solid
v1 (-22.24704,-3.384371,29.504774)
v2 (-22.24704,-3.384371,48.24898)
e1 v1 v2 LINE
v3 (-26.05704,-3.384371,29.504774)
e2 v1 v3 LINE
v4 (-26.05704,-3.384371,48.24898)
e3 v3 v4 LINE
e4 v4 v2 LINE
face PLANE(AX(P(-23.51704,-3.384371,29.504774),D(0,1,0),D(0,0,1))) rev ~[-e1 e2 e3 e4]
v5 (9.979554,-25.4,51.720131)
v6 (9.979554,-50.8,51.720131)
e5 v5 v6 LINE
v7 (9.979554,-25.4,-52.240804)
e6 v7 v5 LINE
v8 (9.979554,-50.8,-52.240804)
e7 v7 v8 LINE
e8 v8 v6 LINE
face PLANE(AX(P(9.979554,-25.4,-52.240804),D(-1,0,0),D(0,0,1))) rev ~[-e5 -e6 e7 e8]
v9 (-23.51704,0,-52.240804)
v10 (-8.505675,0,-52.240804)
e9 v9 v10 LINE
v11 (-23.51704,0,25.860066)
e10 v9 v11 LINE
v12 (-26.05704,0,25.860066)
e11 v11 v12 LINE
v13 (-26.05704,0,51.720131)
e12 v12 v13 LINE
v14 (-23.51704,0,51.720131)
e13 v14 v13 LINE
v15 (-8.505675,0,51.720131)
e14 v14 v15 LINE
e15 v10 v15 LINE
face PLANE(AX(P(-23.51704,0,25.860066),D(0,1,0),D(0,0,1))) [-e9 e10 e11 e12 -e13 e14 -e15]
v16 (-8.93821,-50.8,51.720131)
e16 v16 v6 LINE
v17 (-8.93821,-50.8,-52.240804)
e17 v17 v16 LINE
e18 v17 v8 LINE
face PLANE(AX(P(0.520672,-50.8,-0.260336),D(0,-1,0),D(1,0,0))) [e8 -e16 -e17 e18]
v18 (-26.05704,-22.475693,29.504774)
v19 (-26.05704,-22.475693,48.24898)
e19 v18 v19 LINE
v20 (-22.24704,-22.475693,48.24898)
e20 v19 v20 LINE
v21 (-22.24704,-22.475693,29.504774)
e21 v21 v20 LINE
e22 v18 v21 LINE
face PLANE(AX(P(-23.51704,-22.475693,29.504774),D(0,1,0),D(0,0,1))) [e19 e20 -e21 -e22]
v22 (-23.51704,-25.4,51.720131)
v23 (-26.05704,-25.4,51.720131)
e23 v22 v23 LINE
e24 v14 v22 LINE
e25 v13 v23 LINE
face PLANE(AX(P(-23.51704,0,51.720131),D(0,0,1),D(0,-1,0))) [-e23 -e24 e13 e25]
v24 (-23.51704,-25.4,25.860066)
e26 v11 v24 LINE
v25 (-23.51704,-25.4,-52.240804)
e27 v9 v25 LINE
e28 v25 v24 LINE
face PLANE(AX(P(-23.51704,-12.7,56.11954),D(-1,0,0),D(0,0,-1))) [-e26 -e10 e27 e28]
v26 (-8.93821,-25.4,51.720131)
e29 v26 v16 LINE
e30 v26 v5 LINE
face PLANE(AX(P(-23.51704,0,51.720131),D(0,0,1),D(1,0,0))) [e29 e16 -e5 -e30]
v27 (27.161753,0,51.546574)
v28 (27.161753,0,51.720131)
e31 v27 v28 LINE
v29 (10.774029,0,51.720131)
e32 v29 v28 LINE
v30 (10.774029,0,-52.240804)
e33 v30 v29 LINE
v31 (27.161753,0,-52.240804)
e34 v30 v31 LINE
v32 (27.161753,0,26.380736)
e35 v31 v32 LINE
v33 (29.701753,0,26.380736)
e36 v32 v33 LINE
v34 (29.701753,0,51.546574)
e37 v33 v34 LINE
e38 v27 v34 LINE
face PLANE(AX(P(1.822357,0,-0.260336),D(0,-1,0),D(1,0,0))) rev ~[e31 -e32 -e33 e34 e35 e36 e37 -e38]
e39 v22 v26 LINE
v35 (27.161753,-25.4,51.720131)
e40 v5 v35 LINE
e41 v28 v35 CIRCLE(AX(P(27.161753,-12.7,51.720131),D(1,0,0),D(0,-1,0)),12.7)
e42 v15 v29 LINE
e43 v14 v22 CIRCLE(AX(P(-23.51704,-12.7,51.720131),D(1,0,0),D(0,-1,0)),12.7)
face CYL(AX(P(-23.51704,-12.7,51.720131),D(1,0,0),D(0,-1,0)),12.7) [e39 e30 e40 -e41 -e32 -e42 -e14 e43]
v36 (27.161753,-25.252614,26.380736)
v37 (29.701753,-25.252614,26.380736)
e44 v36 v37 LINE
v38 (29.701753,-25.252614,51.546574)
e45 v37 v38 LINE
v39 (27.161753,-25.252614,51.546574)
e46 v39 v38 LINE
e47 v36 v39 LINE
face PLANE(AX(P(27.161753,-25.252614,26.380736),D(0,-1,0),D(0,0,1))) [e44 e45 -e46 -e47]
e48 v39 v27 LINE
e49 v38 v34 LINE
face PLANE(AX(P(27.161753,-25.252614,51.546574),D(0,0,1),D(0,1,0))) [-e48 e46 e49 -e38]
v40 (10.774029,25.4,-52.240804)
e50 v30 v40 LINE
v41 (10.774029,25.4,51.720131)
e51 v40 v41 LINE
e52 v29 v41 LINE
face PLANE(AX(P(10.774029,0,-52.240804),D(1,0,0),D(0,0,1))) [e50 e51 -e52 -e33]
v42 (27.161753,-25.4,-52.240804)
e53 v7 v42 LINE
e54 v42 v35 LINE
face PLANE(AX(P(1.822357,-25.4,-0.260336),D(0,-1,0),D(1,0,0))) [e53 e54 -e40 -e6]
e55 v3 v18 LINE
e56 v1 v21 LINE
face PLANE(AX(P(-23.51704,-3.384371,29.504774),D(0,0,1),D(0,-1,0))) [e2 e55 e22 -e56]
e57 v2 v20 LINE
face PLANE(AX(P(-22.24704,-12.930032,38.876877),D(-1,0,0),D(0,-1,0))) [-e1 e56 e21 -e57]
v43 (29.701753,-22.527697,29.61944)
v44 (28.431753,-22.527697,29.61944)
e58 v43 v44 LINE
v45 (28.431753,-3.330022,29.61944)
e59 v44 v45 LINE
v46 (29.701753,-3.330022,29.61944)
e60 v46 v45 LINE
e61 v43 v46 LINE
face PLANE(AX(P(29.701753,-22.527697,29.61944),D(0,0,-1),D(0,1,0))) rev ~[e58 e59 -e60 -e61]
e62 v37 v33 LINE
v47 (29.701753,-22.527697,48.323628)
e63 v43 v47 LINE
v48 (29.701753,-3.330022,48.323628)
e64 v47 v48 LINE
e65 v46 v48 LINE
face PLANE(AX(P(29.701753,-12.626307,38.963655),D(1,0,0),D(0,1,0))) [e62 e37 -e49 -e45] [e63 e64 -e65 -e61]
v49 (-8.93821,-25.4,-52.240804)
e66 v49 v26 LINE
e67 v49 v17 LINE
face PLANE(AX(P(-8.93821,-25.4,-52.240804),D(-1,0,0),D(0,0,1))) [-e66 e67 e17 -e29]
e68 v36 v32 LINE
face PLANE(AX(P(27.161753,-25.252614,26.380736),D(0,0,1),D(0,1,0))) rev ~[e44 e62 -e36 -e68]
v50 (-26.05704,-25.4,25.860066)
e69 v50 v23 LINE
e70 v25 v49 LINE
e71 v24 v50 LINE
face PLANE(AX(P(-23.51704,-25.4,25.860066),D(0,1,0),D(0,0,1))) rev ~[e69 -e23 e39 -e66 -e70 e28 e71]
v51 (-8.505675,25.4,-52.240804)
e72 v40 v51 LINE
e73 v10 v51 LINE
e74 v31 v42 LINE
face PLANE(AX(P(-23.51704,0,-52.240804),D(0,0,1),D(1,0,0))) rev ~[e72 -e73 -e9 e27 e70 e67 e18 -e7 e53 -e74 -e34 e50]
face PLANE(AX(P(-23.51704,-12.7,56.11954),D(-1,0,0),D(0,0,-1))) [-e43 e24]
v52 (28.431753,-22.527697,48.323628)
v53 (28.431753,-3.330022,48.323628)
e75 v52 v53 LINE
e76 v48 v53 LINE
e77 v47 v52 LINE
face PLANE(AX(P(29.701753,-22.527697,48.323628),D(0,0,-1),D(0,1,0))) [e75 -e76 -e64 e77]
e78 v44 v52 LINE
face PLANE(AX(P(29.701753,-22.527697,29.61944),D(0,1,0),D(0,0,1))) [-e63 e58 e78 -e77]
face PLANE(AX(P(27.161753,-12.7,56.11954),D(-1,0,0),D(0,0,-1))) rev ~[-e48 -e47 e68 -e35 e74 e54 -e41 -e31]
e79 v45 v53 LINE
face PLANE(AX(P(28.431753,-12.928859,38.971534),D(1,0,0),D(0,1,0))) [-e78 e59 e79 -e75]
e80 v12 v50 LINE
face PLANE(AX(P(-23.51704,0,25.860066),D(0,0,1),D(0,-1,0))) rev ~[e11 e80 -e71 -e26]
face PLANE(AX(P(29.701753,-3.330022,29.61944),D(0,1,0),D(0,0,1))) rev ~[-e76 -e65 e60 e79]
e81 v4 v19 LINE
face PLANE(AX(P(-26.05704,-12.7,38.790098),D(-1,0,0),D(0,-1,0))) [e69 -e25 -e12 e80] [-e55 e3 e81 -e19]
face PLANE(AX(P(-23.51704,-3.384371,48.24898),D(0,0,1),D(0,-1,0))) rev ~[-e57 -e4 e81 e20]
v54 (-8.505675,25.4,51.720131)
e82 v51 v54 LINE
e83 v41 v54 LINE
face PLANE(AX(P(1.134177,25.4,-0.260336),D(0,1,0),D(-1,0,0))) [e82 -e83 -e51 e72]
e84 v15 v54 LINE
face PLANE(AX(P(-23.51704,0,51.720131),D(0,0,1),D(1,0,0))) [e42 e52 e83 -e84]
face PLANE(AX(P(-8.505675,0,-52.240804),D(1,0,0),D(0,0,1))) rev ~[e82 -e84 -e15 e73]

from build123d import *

# Parameters (mm, degrees)
F0_W      = 50.6787924096
F0_H      = 103.9609350264
F1_DEPTH  = 25.4
F4_W      = 18.917764537
F4_H      = 103.9609350264
F5_DEPTH  = 25.4
F6_W      = 19.2797044292
F6_H      = 103.9609350264
F7_DEPTH  = 25.4
F10_W     = 25.2526141703
F10_H     = 25.1658372581
F11_DEPTH = 2.54
F28_W     = 19.1976749338
F28_H     = 18.704187125
F29_DEPTH = 1.27
F30_W     = 19.0913220868
F30_H     = 18.744206056
F31_DEPTH = 1.27
F32_W     = 25.4
F32_H     = 25.8600655943
F32_W_2   = 19.0913220868
F32_H_2   = 18.744206056
F33_DEPTH = 2.54


# Not quite as in the source:
# - the program builds the solid bodies; features that only make, move or delete a surface that nothing else refers to are left out


with BuildPart() as f1:
    # F0 (on Front) → F1 (new body)
    with BuildSketch(Plane.XZ):
        with Locations((1.8223566003, -0.2603363246)):
            Rectangle(F0_W, F0_H)
    extrude(amount=F1_DEPTH)

    # F4 (on face) → F5 (join)
    with BuildSketch(Plane.XZ.offset(25.4)):
        with Locations((0.5206721835, -0.2603363246)):
            Rectangle(F4_W, F4_H)
    extrude(amount=F5_DEPTH)

    # F6 (on face) → F7 (join)
    with BuildSketch(Plane(origin=(0, 0, 0), x_dir=(-1, 0, 0), z_dir=(0, 1, 0))):
        with Locations((-1.1341772042, -0.2603363246)):
            Rectangle(F6_W, F6_H)
    extrude(amount=F7_DEPTH)

    # F9: sweep along a path in F8
    with BuildLine(Plane.XY.offset(51.7201311886)) as f9_path:
        Line((-23.5170396045, -12.7), (27.1617528051, -12.7))
    # F3 (on face) → F9 (sweep)
    with BuildSketch(Plane(origin=(-23.5170396045, 0, 0), x_dir=(0, -1, 0), z_dir=(-1, 0, 0))):
        with BuildLine():
            Line((0, 51.7201311886), (25.4, 51.7201311886))
            ThreePointArc((25.4, 51.7201311886), (12.7, 64.4201311886), (0, 51.7201311886))
        make_face()
    sweep(path=f9_path.line)

    # F10 (on face) → F11 (join)
    with BuildSketch(Plane.YZ.offset(27.1617528051)):
        with Locations((-12.6263070852, 38.9636550099)):
            Rectangle(F10_W, F10_H)
    extrude(amount=F11_DEPTH)

    # F28 (on face) → F29 (cut)
    with BuildSketch(Plane.YZ.offset(29.7017528051)):
        with Locations((-12.9288590979, 38.9715339988)):
            Rectangle(F28_W, F28_H)
    extrude(amount=-F29_DEPTH, mode=Mode.SUBTRACT)

    # F30 (on face) → F31 (cut)
    with BuildSketch(Plane(origin=(-23.5170396045, 0, 0), x_dir=(0, -1, 0), z_dir=(-1, 0, 0))):
        with Locations((12.9300323315, 38.8768771663)):
            Rectangle(F30_W, F30_H)
    extrude(amount=-F31_DEPTH, mode=Mode.SUBTRACT)

    # F32 (on face) → F33 (join)
    with BuildSketch(Plane(origin=(-23.5170396045, 0, 0), x_dir=(0, -1, 0), z_dir=(-1, 0, 0))):
        with Locations((12.7, 38.7900983915)):
            Rectangle(F32_W, F32_H)
        with Locations((12.9300323315, 38.8768771663)):
            Rectangle(F32_W_2, F32_H_2, mode=Mode.SUBTRACT)
    extrude(amount=F33_DEPTH)


solid = f1.part
